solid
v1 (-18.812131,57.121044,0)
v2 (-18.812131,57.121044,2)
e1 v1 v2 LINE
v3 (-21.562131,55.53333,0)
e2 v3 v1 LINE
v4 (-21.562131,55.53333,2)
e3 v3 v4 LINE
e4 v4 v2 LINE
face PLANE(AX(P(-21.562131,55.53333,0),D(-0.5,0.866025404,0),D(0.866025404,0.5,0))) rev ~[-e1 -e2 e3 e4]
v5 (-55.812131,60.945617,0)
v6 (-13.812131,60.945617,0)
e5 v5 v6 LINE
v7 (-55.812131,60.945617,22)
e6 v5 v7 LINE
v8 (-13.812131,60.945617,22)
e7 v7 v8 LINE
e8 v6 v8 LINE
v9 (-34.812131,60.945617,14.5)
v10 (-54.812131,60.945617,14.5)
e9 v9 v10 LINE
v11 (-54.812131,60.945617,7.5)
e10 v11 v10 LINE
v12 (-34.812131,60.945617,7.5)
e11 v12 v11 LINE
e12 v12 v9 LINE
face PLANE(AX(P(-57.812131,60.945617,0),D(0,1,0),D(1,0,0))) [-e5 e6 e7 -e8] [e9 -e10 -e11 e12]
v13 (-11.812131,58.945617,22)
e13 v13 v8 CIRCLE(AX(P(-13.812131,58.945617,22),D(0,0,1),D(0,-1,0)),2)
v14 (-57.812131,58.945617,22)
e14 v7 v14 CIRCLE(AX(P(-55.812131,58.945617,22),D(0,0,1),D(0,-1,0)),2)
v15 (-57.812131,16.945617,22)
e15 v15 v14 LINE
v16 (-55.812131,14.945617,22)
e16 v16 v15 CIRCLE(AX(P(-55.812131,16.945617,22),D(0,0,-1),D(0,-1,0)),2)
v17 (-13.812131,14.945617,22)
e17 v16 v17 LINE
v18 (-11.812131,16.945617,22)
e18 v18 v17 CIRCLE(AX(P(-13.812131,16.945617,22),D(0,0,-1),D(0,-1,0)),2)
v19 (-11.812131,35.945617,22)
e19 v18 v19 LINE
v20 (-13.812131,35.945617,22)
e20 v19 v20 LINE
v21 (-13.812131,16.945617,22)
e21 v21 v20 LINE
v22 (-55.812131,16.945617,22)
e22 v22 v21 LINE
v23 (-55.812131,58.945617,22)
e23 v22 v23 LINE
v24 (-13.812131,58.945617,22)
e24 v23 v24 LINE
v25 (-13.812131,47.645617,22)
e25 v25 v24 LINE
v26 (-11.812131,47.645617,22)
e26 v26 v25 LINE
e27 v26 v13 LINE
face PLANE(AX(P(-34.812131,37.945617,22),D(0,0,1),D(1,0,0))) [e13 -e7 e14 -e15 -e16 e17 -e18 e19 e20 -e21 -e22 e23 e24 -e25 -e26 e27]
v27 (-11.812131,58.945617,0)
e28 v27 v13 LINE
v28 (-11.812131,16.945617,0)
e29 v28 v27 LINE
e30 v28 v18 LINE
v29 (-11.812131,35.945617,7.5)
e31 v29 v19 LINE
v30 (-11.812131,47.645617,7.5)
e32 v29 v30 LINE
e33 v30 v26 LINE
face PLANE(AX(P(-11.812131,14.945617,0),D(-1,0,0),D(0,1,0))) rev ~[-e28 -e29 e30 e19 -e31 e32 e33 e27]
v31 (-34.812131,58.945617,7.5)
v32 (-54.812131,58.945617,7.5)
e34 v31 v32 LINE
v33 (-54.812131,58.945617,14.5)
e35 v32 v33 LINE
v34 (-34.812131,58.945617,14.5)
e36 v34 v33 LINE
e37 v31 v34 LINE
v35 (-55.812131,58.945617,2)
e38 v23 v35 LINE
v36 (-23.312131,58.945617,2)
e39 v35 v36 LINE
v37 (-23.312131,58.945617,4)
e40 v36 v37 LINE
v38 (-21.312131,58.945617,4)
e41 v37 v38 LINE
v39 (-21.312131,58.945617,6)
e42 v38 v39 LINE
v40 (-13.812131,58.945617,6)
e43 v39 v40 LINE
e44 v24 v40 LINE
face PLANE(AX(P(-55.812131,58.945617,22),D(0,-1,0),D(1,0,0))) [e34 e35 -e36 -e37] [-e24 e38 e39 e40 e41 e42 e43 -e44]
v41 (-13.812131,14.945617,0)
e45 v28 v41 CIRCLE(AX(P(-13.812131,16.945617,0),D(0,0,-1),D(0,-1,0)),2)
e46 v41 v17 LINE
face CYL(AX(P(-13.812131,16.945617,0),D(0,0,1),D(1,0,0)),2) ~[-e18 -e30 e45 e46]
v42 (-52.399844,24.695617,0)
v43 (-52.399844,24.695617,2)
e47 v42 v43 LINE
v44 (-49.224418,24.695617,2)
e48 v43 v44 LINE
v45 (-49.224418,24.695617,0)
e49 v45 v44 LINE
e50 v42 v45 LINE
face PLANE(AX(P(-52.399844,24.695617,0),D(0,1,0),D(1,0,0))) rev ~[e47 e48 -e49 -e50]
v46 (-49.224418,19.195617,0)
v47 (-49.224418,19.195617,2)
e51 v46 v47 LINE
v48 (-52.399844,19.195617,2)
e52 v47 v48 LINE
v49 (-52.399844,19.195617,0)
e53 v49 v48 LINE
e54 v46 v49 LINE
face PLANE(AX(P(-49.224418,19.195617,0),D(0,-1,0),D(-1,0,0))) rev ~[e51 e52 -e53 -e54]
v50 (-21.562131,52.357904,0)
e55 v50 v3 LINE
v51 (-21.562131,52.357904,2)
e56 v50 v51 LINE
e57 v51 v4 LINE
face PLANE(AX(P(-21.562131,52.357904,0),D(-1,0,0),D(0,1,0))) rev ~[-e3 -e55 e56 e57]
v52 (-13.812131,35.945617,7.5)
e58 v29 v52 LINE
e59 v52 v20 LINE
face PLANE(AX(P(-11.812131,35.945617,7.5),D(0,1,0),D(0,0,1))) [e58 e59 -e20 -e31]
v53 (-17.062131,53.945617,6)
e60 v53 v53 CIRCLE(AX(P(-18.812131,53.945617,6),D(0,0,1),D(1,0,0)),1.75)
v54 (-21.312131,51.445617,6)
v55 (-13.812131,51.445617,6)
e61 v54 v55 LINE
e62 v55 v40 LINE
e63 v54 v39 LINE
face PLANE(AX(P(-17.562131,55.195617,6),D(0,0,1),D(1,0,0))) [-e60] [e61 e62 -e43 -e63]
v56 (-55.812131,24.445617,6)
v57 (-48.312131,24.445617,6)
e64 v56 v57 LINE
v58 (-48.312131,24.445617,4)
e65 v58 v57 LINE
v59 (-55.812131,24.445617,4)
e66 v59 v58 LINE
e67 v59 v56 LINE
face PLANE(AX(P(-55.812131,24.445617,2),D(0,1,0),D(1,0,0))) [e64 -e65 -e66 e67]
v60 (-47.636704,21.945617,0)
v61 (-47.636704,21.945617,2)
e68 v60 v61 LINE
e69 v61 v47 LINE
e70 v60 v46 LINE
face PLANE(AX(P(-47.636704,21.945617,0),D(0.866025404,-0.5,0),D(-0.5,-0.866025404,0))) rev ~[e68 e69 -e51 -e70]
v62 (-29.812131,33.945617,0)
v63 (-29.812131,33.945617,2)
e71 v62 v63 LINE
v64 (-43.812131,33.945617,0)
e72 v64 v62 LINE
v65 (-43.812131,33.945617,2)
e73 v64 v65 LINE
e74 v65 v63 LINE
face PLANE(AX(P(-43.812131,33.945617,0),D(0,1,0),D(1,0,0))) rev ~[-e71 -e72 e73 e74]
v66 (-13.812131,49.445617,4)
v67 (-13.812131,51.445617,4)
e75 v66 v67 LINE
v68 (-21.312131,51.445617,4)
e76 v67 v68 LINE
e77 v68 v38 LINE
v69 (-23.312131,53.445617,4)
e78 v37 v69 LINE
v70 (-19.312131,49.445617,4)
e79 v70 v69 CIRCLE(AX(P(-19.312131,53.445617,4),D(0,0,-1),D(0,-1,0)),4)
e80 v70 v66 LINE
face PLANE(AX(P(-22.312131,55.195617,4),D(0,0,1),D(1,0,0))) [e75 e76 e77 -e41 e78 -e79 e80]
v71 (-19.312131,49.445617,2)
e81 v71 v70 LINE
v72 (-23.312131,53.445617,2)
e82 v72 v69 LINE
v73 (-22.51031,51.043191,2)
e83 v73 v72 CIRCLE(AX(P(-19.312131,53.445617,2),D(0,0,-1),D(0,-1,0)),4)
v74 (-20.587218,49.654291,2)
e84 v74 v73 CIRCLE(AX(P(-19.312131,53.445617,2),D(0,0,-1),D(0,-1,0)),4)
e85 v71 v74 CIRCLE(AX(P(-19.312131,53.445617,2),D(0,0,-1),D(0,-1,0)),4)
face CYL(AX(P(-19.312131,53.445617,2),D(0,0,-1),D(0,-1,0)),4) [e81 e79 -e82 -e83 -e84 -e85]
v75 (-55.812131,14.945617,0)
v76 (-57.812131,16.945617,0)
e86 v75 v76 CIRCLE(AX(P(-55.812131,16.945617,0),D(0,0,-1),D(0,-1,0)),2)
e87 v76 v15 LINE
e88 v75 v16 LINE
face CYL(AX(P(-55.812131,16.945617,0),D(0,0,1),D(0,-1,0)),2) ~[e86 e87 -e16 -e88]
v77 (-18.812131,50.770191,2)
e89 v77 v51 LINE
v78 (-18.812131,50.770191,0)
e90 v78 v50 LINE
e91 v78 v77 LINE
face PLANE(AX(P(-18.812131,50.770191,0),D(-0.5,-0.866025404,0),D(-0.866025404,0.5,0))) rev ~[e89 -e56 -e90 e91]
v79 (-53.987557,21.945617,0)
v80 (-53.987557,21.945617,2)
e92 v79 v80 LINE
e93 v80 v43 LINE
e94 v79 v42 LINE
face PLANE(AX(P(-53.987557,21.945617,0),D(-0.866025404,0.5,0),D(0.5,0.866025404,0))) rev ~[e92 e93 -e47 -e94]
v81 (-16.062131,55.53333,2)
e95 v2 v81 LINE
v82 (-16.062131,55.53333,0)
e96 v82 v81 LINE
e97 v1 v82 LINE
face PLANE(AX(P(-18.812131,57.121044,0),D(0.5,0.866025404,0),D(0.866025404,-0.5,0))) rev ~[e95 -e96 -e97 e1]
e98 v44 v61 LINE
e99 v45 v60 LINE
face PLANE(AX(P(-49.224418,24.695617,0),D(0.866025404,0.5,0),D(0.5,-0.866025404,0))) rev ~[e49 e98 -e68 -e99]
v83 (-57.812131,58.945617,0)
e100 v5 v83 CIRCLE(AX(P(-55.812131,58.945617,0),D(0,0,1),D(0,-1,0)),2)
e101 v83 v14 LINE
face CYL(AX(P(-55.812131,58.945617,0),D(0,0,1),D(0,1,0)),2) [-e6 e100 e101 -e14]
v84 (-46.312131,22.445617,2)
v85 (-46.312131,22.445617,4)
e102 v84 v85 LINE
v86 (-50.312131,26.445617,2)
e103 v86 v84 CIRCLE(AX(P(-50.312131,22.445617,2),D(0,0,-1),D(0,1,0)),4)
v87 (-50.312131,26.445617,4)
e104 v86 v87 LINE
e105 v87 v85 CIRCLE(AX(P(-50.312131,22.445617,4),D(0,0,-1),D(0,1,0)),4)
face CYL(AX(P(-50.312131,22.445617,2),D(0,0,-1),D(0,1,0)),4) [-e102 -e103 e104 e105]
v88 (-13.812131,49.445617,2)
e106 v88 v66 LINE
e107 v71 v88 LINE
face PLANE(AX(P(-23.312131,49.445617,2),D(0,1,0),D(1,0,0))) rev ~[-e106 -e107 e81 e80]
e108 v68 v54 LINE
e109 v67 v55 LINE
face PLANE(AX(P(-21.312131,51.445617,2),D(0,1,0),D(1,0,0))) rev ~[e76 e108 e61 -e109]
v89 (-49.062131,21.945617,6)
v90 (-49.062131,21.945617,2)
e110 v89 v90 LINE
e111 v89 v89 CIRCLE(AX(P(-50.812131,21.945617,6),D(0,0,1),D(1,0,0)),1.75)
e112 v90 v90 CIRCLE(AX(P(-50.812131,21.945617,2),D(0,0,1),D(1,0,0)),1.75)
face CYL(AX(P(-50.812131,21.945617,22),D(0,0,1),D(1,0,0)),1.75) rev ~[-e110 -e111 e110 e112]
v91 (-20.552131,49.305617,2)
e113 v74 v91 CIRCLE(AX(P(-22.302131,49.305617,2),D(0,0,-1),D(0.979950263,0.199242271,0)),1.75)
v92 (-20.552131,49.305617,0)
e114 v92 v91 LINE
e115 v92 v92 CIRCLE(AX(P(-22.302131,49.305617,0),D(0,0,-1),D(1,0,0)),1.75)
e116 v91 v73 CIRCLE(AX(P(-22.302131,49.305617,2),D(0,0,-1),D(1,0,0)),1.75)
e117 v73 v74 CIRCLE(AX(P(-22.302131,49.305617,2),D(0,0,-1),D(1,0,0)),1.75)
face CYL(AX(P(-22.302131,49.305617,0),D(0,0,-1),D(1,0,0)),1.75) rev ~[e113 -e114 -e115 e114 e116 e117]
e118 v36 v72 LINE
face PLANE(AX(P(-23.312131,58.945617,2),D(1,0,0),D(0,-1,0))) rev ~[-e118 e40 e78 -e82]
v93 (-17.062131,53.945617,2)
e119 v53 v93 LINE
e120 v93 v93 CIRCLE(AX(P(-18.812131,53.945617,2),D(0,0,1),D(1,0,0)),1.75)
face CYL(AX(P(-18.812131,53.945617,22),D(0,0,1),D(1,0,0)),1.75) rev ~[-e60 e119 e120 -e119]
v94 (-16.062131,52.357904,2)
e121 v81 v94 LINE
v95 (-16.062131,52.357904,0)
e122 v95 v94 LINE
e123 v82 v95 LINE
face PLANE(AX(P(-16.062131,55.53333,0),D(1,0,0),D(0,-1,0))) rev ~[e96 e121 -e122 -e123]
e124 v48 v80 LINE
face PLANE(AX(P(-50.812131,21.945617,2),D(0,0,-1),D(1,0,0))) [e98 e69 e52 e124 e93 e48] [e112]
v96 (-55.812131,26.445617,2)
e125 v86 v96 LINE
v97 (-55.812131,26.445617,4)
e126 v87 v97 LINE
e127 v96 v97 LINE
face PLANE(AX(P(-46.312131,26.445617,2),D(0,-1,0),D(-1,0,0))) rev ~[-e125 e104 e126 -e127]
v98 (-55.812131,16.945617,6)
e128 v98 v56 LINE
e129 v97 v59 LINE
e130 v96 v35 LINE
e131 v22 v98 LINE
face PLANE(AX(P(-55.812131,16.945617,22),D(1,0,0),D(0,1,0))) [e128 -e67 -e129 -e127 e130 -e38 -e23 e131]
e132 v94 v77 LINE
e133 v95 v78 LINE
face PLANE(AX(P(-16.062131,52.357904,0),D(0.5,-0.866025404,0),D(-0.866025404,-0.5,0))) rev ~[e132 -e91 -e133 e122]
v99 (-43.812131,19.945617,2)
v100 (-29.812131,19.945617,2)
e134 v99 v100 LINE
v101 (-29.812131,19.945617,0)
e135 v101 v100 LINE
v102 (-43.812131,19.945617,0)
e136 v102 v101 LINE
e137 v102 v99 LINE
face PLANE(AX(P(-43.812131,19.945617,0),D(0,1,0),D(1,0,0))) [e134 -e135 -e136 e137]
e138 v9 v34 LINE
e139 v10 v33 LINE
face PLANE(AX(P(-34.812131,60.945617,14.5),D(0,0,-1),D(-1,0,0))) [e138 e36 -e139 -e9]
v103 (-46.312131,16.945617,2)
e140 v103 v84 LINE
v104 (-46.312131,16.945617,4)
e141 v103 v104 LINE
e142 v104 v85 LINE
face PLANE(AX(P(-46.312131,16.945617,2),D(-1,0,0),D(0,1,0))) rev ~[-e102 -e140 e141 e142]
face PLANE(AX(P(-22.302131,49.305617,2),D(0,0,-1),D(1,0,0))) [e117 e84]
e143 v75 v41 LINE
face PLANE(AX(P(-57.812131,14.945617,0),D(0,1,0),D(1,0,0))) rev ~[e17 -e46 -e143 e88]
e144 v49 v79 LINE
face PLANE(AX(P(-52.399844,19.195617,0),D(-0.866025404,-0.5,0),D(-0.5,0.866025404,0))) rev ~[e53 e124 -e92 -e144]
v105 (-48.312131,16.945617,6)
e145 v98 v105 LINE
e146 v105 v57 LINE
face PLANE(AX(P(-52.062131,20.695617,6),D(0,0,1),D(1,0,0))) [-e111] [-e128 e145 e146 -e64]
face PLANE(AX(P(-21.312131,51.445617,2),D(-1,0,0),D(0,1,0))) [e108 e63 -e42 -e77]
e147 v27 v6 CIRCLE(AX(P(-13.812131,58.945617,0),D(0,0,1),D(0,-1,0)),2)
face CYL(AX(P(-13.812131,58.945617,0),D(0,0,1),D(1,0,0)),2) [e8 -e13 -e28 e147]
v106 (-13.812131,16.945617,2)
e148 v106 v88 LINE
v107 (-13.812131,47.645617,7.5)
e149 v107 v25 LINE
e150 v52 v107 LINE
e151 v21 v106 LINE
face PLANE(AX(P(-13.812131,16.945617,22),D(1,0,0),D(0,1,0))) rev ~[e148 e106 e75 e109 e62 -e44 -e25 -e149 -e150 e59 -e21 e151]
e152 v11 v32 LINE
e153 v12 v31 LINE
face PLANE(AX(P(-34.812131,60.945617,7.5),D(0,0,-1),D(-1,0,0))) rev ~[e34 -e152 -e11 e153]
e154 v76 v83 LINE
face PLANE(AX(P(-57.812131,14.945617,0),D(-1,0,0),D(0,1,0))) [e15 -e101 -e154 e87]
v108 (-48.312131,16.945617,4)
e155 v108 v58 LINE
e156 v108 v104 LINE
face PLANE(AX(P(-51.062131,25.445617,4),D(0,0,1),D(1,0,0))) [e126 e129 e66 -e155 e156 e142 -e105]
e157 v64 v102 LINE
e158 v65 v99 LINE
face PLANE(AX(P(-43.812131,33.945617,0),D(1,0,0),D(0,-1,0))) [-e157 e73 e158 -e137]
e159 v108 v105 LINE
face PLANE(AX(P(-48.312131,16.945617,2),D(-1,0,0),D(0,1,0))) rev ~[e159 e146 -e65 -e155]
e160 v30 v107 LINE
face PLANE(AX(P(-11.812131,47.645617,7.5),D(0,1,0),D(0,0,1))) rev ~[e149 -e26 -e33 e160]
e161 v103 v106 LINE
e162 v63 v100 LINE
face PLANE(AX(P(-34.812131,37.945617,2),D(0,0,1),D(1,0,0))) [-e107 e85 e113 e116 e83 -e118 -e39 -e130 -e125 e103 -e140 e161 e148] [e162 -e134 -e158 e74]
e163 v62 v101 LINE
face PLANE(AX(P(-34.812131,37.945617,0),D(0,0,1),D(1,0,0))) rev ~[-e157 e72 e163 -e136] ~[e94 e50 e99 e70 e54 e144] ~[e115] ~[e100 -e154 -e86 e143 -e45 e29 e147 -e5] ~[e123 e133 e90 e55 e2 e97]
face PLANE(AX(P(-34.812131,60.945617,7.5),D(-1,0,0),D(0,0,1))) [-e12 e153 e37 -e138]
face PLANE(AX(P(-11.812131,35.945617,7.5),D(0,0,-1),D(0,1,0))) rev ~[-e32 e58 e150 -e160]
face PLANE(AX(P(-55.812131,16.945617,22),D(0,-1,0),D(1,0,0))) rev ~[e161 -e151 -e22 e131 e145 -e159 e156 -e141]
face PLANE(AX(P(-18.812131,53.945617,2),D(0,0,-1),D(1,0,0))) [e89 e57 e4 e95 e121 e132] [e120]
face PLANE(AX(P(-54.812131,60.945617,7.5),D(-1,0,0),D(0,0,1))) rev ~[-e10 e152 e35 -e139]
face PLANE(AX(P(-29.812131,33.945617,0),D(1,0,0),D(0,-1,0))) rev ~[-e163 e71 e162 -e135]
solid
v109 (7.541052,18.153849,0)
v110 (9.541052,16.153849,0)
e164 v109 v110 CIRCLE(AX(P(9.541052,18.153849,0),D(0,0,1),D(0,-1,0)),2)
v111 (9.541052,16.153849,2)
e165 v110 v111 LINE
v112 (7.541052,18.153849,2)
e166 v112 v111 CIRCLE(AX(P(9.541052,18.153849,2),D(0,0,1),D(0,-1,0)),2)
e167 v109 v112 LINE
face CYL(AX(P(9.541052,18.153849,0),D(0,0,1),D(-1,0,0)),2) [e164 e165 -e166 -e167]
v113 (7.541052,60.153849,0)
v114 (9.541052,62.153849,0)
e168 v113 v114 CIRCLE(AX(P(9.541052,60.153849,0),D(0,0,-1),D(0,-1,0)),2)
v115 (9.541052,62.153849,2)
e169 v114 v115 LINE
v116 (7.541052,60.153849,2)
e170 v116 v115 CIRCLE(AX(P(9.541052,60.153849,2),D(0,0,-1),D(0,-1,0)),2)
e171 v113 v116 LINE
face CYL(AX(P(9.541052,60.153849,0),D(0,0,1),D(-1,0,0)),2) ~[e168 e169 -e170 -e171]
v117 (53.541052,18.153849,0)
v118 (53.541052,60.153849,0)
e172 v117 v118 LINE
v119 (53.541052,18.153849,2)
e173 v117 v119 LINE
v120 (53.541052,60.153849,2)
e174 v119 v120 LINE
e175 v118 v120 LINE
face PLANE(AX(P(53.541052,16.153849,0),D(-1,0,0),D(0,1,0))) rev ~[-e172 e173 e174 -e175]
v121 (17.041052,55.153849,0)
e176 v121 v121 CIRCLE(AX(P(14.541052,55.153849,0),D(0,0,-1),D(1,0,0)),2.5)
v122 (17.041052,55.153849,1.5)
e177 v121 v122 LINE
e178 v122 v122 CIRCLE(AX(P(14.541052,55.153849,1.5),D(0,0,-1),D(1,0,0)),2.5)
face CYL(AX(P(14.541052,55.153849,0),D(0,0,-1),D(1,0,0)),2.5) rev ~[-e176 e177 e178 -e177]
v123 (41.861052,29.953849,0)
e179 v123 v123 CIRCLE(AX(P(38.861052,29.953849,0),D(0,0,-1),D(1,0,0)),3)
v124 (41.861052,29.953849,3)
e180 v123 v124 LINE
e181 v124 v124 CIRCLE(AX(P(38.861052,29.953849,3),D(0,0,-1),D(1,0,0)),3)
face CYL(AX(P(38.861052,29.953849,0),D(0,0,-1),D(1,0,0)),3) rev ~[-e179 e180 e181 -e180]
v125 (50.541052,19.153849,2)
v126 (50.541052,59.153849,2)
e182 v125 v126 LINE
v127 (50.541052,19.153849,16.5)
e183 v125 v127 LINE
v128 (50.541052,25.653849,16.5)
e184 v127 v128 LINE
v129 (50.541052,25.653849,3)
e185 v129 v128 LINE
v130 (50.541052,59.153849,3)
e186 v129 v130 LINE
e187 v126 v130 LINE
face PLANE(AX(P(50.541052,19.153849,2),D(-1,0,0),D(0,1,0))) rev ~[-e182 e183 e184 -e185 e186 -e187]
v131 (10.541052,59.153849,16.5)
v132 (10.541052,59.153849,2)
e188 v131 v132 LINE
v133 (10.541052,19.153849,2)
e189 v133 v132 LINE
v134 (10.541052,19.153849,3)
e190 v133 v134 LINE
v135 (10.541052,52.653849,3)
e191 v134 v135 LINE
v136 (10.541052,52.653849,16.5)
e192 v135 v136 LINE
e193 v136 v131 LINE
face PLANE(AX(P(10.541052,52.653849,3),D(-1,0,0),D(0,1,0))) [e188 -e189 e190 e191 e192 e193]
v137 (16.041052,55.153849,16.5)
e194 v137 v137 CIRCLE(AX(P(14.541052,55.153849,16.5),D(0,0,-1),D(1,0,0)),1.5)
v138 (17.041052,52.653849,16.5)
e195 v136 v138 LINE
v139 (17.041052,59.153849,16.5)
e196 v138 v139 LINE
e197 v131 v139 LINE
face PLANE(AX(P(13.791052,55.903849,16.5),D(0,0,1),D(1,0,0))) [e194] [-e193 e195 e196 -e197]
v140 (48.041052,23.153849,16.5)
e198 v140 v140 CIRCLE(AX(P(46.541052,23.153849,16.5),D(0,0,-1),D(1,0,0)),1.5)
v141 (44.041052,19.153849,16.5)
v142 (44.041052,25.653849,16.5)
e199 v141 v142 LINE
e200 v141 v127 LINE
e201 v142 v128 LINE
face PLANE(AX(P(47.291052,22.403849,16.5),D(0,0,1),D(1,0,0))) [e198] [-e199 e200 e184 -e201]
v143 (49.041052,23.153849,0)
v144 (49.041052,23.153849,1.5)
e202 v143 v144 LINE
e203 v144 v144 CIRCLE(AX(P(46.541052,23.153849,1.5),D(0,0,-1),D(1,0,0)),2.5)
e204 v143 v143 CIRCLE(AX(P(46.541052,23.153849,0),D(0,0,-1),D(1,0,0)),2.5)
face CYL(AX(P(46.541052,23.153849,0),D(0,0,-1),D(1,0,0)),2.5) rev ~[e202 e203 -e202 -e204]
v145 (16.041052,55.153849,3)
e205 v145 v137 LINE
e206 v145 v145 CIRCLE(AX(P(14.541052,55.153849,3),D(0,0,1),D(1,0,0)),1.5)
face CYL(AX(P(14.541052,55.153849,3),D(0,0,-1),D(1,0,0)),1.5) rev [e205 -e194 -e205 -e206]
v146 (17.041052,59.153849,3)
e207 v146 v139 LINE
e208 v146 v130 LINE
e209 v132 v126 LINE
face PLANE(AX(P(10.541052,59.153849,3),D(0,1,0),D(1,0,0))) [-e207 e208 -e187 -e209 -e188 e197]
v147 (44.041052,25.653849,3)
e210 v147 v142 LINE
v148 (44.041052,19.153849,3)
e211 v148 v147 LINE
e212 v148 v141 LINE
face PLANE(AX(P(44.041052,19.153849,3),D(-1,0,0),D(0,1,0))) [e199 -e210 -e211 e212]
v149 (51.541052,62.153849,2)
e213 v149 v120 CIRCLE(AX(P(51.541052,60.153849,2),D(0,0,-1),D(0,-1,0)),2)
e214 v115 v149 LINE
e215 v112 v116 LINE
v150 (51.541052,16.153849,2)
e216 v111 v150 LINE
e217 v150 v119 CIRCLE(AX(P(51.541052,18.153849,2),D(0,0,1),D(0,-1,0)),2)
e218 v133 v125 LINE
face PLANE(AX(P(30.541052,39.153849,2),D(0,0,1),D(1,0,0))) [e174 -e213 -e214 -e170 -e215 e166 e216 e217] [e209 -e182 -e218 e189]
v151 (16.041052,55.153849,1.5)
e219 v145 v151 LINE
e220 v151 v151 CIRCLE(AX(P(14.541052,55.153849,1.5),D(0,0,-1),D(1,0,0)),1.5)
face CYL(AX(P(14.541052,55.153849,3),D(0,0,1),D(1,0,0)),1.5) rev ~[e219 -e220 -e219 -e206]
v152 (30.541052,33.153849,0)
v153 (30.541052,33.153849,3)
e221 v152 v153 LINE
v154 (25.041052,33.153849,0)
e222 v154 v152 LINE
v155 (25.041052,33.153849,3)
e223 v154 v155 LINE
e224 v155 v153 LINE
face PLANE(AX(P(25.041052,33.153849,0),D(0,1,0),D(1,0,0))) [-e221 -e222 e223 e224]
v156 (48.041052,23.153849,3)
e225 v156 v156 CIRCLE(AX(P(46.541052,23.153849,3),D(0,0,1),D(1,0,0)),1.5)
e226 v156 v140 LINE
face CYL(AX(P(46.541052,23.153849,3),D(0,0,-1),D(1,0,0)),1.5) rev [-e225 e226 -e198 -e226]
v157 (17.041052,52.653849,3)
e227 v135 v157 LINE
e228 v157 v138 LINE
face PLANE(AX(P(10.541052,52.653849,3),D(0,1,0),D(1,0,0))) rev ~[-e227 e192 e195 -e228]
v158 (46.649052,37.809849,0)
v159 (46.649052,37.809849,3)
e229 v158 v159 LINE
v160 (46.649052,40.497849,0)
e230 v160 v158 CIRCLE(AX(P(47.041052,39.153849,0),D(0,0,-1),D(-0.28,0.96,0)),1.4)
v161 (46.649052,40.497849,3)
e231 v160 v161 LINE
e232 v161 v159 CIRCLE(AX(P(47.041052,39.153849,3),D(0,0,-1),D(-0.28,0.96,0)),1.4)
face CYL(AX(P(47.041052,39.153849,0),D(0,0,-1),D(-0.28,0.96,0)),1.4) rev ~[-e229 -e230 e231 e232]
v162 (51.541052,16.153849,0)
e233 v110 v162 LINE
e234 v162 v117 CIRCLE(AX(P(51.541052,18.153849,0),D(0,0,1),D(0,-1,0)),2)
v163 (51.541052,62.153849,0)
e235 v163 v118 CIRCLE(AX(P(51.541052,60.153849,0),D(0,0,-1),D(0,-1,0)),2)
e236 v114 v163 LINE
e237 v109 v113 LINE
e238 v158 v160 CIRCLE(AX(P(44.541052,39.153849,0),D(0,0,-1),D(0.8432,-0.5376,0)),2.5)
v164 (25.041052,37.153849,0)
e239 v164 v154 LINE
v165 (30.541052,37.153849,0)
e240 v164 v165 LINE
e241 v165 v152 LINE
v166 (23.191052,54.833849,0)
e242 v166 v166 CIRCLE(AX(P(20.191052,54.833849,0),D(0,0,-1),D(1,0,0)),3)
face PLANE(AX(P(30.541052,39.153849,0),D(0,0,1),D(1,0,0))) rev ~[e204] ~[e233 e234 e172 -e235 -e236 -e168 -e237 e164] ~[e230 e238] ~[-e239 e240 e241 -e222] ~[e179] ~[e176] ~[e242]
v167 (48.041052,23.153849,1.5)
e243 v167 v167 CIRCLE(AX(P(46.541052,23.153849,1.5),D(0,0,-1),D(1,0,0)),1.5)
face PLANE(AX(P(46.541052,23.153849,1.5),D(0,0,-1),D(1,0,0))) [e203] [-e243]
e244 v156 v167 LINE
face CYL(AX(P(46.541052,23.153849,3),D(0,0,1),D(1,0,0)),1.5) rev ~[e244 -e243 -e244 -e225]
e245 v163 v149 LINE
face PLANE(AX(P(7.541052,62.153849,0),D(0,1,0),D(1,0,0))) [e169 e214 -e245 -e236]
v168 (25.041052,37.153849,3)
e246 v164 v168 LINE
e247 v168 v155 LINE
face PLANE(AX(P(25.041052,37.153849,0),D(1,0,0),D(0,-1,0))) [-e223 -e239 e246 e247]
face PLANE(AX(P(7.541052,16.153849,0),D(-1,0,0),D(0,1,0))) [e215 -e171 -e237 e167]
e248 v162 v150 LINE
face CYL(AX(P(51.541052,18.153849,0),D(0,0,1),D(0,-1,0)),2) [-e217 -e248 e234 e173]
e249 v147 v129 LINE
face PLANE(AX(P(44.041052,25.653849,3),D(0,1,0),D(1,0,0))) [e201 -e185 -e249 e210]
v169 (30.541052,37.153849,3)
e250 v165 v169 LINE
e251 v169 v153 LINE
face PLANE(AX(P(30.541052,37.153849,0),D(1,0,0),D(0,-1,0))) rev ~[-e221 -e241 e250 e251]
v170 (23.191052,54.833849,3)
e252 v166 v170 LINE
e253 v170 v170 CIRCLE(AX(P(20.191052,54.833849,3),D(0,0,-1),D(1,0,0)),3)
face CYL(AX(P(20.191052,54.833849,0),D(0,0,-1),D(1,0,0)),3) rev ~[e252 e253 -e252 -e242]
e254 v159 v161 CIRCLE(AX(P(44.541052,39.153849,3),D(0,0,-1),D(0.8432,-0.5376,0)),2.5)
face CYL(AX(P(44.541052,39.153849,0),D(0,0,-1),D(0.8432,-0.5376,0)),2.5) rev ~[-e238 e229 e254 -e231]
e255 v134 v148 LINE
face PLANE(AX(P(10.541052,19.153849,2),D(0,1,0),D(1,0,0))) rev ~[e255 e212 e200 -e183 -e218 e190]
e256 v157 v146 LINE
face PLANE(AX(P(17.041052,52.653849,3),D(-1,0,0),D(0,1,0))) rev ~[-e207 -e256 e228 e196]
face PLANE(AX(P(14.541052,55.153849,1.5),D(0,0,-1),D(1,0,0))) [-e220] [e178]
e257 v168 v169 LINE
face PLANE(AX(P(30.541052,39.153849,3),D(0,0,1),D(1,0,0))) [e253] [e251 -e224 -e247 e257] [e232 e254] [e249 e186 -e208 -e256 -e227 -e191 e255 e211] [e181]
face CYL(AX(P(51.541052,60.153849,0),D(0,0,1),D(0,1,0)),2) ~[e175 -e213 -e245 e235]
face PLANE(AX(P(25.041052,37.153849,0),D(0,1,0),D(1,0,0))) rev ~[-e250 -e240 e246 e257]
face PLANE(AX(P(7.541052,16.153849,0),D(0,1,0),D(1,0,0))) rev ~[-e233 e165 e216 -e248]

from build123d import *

# Parameters (mm, degrees)
F0_W         = 46
F0_H         = 46
F1_DEPTH     = 22
F2_W         = 42
F2_H         = 42
F3_DEPTH     = 20
F4_W         = 7.5
F4_H         = 7.5
F5_DEPTH     = 4
F7_W         = 2
F7_H         = 7.5
F8_DEPTH     = 2
F10_DEPTH    = 2
F11_W        = 46
F11_H        = 46
F12_DEPTH    = 2
F13_W        = 40
F13_H        = 40
F14_DEPTH    = 1
F15_W        = 6.5
F15_H        = 6.5
F16_DEPTH    = 13.5
F17_R        = 1.5
F18_DEPTH    = 25
F19_DEPTH    = 25
F20_W        = 11.7
F20_H        = 14.5
F21_DEPTH    = 2
F22_W        = 20
F22_H        = 7
F23_DEPTH    = 2
F24_R        = 3
F24_W        = 5.5
F24_H        = 4
F25_DEPTH    = 3
F26_W        = 14
F26_H        = 14
F26_R        = 1.75
F28_DEPTH    = 2
F27_R        = 2.5
F27_R_2      = 1.5
F29_DEPTH    = 1.5
F6_R         = 1.75
F30_DEPTH    = 25
F31_T1_DEPTH = 12
F32_R        = 2
F32_2_R      = 2


# Not quite as in the source:
# - a fillet or chamfer that OpenCascade refuses, or shapes differently, is made with other operations: its cross-section is extruded or revolved along the edge and cut away or added
# - a feature names something its author has since deleted; it is built from what else it names


with BuildPart() as f1:
    # F0 (on Top) → F1 (new body)
    with BuildSketch(Plane.XY):
        with Locations((-34.8121308275, 37.9456170828)):
            Rectangle(F0_W, F0_H)
    extrude(amount=F1_DEPTH)

    # F2 (on face) → F3 (cut)
    with BuildSketch(Plane.XY.offset(22)):
        with Locations((-34.8121308275, 37.9456170828)):
            Rectangle(F2_W, F2_H)
    extrude(amount=-F3_DEPTH, mode=Mode.SUBTRACT)

    # F4 (on face) → F5 (join)
    with BuildSketch(Plane.XY.offset(2)):
        with Locations((-52.0621308275, 20.6956170828)):
            Rectangle(F4_W, F4_H)
        with Locations((-17.5621308275, 55.1956170828)):
            Rectangle(F4_W, F4_H)
    extrude(amount=F5_DEPTH)

    # F7 (on face) → F8 (join)
    with BuildSketch(Plane.XY.offset(2)):
        Polygon((-46.3121308275, 26.4456170828), (-55.8121308275, 26.4456170828), (-55.8121308275, 24.4456170828), (-48.3121308275, 24.4456170828), (-46.3121308275, 24.4456170828), align=None)
        with Locations((-47.3121308275, 20.6956170828)):
            Rectangle(F7_W, F7_H)
        with Locations((-22.3121308275, 55.1956170828)):
            Rectangle(F7_W, F7_H)
        Polygon((-13.8121308275, 51.4456170828), (-21.3121308275, 51.4456170828), (-23.3121308275, 51.4456170828), (-23.3121308275, 49.4456170828), (-13.8121308275, 49.4456170828), align=None)
    extrude(amount=F8_DEPTH)

    # F9 (on face) → F10 (cut)
    with BuildSketch(Plane(origin=(0, 0, 0), x_dir=(1, 0, 0), z_dir=(0, 0, -1))):
        Polygon((-16.0621308275, -55.5333303231), (-16.0621308275, -52.3579038425), (-18.8121308275, -50.7701906023), (-21.5621308275, -52.3579038425), (-21.5621308275, -55.5333303231), (-18.8121308275, -57.1210435634), align=None)
        Polygon((-47.6367043469, -21.9456170828), (-49.2244175872, -19.1956170828), (-52.3998440677, -19.1956170828), (-53.987557308, -21.9456170828), (-52.3998440677, -24.6956170828), (-49.2244175872, -24.6956170828), align=None)
    extrude(amount=-F10_DEPTH, mode=Mode.SUBTRACT)

    # F20 (on face) → F21 (cut)
    with BuildSketch(Plane.YZ.offset(-11.8121308275)):
        with Locations((41.7956170828, 14.75)):
            Rectangle(F20_W, F20_H)
    extrude(amount=-F21_DEPTH, mode=Mode.SUBTRACT)

    # F22 (on face) → F23 (cut)
    with BuildSketch(Plane(origin=(0, 60.9456170828, 0), x_dir=(-1, 0, 0), z_dir=(0, 1, 0))):
        with Locations((44.8121308275, 11)):
            Rectangle(F22_W, F22_H)
    extrude(amount=-F23_DEPTH, mode=Mode.SUBTRACT)

    # F26 (on face) → F28 (cut)
    with BuildSketch(Plane(origin=(0, 0, 0), x_dir=(1, 0, 0), z_dir=(0, 0, -1))):
        with Locations((-36.8121308275, -26.9456170828)):
            Rectangle(F26_W, F26_H)
        with Locations((-22.3021308275, -49.3056170828)):
            Circle(F26_R)
    extrude(amount=-F28_DEPTH, mode=Mode.SUBTRACT)

    # F6 (on face) → F30 (cut)
    with BuildSketch(Plane.XY.offset(22)):
        with Locations((-18.8121308275, 53.9456170828)):
            Circle(F6_R)
        with Locations((-50.8121308275, 21.9456170828)):
            Circle(F6_R)
    extrude(amount=-F30_DEPTH, mode=Mode.SUBTRACT)

    # F31: fillet of radius 4 on 2 edges, made by hand

    # F31_s2 → F31_t1 (cut)
    with BuildSketch(Plane.XY.offset(2)):
        with BuildLine():
            ThreePointArc((-50.3121308275, 26.4456170828), (-47.4837037027, 25.2740442076), (-46.3121308275, 22.4456170828))
            Line((-46.3121308275, 22.4456170828), (-46.3121308275, 26.4456170828))
            Line((-46.3121308275, 26.4456170828), (-50.3121308275, 26.4456170828))
        make_face()
        with BuildLine():
            ThreePointArc((-19.3121308275, 49.4456170828), (-22.1405579522, 50.6171899581), (-23.3121308275, 53.4456170828))
            Line((-23.3121308275, 53.4456170828), (-23.3121308275, 49.4456170828))
            Line((-23.3121308275, 49.4456170828), (-19.3121308275, 49.4456170828))
        make_face()
    extrude(amount=F31_T1_DEPTH, mode=Mode.SUBTRACT)

    # F32
    f32_edges = [f1.edges().sort_by_distance(p)[0] for p in [
        (-57.812131, 14.945617, 11),
        (-57.812131, 60.945617, 11),
        (-11.812131, 60.945617, 11),
        (-11.812131, 14.945617, 11),
    ]]
    fillet(f32_edges, radius=F32_R)


with BuildPart() as f12:
    # F11 (on Top) → F12 (new body)
    with BuildSketch(Plane.XY):
        with Locations((30.5410524812, 39.1538485997)):
            Rectangle(F11_W, F11_H)
    extrude(amount=F12_DEPTH)

    # F13 (on face) → F14 (join)
    with BuildSketch(Plane.XY.offset(2)):
        with Locations((30.5410524812, 39.1538485997)):
            Rectangle(F13_W, F13_H)
    extrude(amount=F14_DEPTH)

    # F15 (on face) → F16 (join)
    with BuildSketch(Plane.XY.offset(3)):
        with Locations((13.7910524812, 55.9038485997)):
            Rectangle(F15_W, F15_H)
        with Locations((47.2910524812, 22.4038485997)):
            Rectangle(F15_W, F15_H)
    extrude(amount=F16_DEPTH)

    # F17 (on face) → F18 (cut)
    with BuildSketch(Plane.XY.offset(3)):
        with Locations((14.5410524812, 55.1538485997)):
            Circle(F17_R)
        with Locations((46.5410524812, 23.1538485997)):
            Circle(F17_R)
    extrude(amount=F18_DEPTH, mode=Mode.SUBTRACT)

    # F17 (on face) → F19 (cut)
    with BuildSketch(Plane.XY.offset(3)):
        with Locations((14.5410524812, 55.1538485997)):
            Circle(F17_R)
        with Locations((46.5410524812, 23.1538485997)):
            Circle(F17_R)
    extrude(amount=-F19_DEPTH, mode=Mode.SUBTRACT)

    # F24 (on face) → F25 (cut)
    with BuildSketch(Plane(origin=(0, 0, 0), x_dir=(1, 0, 0), z_dir=(0, 0, -1))):
        with Locations((38.8610524812, -29.9538485997)):
            Circle(F24_R)
        with Locations((27.7910524812, -35.1538485997)):
            Rectangle(F24_W, F24_H)
        with Locations((20.1910524812, -54.8338485997)):
            Circle(F24_R)
        with BuildLine():
            ThreePointArc((46.6490524812, -40.4978485997), (45.6410524812, -39.1538485997), (46.6490524812, -37.8098485997))
            ThreePointArc((46.6490524812, -37.8098485997), (42.0410524812, -39.1538485997), (46.6490524812, -40.4978485997))
        make_face()
        with BuildLine():
            ThreePointArc((46.6490524812, -37.8098485997), (46.9410524812, -38.4538485997), (47.0410524812, -39.1538485997))
            ThreePointArc((47.0410524812, -39.1538485997), (46.9410524812, -39.8538485997), (46.6490524812, -40.4978485997))
            ThreePointArc((46.6490524812, -40.4978485997), (47.8810524812, -40.2738485997), (48.4410524812, -39.1538485997))
            ThreePointArc((48.4410524812, -39.1538485997), (47.8810524812, -38.0338485997), (46.6490524812, -37.8098485997))
        make_face()
        with BuildLine():
            ThreePointArc((46.6490524812, -40.4978485997), (46.9410524812, -39.8538485997), (47.0410524812, -39.1538485997))
            ThreePointArc((47.0410524812, -39.1538485997), (46.9410524812, -38.4538485997), (46.6490524812, -37.8098485997))
            ThreePointArc((46.6490524812, -37.8098485997), (45.6410524812, -39.1538485997), (46.6490524812, -40.4978485997))
        make_face()
    extrude(amount=-F25_DEPTH, mode=Mode.SUBTRACT)

    # F27 (on face) → F29 (cut)
    with BuildSketch(Plane(origin=(0, 0, 0), x_dir=(1, 0, 0), z_dir=(0, 0, -1))):
        with Locations((14.5410524812, -55.1538485997)):
            Circle(F27_R)
        with Locations((14.5410524812, -55.1538485997)):
            Circle(F27_R_2, mode=Mode.SUBTRACT)
        with Locations((46.5410524812, -23.1538485997)):
            Circle(F27_R)
        with Locations((46.5410524812, -23.1538485997)):
            Circle(F27_R_2, mode=Mode.SUBTRACT)
    extrude(amount=-F29_DEPTH, mode=Mode.SUBTRACT)

    # F32#2
    f32_2_edges = [f12.edges().sort_by_distance(p)[0] for p in [
        (7.541052, 16.153849, 1),
        (7.541052, 62.153849, 1),
        (53.541052, 62.153849, 1),
        (53.541052, 16.153849, 1),
    ]]
    fillet(f32_2_edges, radius=F32_2_R)


solid = Compound([f1.part, f12.part])
